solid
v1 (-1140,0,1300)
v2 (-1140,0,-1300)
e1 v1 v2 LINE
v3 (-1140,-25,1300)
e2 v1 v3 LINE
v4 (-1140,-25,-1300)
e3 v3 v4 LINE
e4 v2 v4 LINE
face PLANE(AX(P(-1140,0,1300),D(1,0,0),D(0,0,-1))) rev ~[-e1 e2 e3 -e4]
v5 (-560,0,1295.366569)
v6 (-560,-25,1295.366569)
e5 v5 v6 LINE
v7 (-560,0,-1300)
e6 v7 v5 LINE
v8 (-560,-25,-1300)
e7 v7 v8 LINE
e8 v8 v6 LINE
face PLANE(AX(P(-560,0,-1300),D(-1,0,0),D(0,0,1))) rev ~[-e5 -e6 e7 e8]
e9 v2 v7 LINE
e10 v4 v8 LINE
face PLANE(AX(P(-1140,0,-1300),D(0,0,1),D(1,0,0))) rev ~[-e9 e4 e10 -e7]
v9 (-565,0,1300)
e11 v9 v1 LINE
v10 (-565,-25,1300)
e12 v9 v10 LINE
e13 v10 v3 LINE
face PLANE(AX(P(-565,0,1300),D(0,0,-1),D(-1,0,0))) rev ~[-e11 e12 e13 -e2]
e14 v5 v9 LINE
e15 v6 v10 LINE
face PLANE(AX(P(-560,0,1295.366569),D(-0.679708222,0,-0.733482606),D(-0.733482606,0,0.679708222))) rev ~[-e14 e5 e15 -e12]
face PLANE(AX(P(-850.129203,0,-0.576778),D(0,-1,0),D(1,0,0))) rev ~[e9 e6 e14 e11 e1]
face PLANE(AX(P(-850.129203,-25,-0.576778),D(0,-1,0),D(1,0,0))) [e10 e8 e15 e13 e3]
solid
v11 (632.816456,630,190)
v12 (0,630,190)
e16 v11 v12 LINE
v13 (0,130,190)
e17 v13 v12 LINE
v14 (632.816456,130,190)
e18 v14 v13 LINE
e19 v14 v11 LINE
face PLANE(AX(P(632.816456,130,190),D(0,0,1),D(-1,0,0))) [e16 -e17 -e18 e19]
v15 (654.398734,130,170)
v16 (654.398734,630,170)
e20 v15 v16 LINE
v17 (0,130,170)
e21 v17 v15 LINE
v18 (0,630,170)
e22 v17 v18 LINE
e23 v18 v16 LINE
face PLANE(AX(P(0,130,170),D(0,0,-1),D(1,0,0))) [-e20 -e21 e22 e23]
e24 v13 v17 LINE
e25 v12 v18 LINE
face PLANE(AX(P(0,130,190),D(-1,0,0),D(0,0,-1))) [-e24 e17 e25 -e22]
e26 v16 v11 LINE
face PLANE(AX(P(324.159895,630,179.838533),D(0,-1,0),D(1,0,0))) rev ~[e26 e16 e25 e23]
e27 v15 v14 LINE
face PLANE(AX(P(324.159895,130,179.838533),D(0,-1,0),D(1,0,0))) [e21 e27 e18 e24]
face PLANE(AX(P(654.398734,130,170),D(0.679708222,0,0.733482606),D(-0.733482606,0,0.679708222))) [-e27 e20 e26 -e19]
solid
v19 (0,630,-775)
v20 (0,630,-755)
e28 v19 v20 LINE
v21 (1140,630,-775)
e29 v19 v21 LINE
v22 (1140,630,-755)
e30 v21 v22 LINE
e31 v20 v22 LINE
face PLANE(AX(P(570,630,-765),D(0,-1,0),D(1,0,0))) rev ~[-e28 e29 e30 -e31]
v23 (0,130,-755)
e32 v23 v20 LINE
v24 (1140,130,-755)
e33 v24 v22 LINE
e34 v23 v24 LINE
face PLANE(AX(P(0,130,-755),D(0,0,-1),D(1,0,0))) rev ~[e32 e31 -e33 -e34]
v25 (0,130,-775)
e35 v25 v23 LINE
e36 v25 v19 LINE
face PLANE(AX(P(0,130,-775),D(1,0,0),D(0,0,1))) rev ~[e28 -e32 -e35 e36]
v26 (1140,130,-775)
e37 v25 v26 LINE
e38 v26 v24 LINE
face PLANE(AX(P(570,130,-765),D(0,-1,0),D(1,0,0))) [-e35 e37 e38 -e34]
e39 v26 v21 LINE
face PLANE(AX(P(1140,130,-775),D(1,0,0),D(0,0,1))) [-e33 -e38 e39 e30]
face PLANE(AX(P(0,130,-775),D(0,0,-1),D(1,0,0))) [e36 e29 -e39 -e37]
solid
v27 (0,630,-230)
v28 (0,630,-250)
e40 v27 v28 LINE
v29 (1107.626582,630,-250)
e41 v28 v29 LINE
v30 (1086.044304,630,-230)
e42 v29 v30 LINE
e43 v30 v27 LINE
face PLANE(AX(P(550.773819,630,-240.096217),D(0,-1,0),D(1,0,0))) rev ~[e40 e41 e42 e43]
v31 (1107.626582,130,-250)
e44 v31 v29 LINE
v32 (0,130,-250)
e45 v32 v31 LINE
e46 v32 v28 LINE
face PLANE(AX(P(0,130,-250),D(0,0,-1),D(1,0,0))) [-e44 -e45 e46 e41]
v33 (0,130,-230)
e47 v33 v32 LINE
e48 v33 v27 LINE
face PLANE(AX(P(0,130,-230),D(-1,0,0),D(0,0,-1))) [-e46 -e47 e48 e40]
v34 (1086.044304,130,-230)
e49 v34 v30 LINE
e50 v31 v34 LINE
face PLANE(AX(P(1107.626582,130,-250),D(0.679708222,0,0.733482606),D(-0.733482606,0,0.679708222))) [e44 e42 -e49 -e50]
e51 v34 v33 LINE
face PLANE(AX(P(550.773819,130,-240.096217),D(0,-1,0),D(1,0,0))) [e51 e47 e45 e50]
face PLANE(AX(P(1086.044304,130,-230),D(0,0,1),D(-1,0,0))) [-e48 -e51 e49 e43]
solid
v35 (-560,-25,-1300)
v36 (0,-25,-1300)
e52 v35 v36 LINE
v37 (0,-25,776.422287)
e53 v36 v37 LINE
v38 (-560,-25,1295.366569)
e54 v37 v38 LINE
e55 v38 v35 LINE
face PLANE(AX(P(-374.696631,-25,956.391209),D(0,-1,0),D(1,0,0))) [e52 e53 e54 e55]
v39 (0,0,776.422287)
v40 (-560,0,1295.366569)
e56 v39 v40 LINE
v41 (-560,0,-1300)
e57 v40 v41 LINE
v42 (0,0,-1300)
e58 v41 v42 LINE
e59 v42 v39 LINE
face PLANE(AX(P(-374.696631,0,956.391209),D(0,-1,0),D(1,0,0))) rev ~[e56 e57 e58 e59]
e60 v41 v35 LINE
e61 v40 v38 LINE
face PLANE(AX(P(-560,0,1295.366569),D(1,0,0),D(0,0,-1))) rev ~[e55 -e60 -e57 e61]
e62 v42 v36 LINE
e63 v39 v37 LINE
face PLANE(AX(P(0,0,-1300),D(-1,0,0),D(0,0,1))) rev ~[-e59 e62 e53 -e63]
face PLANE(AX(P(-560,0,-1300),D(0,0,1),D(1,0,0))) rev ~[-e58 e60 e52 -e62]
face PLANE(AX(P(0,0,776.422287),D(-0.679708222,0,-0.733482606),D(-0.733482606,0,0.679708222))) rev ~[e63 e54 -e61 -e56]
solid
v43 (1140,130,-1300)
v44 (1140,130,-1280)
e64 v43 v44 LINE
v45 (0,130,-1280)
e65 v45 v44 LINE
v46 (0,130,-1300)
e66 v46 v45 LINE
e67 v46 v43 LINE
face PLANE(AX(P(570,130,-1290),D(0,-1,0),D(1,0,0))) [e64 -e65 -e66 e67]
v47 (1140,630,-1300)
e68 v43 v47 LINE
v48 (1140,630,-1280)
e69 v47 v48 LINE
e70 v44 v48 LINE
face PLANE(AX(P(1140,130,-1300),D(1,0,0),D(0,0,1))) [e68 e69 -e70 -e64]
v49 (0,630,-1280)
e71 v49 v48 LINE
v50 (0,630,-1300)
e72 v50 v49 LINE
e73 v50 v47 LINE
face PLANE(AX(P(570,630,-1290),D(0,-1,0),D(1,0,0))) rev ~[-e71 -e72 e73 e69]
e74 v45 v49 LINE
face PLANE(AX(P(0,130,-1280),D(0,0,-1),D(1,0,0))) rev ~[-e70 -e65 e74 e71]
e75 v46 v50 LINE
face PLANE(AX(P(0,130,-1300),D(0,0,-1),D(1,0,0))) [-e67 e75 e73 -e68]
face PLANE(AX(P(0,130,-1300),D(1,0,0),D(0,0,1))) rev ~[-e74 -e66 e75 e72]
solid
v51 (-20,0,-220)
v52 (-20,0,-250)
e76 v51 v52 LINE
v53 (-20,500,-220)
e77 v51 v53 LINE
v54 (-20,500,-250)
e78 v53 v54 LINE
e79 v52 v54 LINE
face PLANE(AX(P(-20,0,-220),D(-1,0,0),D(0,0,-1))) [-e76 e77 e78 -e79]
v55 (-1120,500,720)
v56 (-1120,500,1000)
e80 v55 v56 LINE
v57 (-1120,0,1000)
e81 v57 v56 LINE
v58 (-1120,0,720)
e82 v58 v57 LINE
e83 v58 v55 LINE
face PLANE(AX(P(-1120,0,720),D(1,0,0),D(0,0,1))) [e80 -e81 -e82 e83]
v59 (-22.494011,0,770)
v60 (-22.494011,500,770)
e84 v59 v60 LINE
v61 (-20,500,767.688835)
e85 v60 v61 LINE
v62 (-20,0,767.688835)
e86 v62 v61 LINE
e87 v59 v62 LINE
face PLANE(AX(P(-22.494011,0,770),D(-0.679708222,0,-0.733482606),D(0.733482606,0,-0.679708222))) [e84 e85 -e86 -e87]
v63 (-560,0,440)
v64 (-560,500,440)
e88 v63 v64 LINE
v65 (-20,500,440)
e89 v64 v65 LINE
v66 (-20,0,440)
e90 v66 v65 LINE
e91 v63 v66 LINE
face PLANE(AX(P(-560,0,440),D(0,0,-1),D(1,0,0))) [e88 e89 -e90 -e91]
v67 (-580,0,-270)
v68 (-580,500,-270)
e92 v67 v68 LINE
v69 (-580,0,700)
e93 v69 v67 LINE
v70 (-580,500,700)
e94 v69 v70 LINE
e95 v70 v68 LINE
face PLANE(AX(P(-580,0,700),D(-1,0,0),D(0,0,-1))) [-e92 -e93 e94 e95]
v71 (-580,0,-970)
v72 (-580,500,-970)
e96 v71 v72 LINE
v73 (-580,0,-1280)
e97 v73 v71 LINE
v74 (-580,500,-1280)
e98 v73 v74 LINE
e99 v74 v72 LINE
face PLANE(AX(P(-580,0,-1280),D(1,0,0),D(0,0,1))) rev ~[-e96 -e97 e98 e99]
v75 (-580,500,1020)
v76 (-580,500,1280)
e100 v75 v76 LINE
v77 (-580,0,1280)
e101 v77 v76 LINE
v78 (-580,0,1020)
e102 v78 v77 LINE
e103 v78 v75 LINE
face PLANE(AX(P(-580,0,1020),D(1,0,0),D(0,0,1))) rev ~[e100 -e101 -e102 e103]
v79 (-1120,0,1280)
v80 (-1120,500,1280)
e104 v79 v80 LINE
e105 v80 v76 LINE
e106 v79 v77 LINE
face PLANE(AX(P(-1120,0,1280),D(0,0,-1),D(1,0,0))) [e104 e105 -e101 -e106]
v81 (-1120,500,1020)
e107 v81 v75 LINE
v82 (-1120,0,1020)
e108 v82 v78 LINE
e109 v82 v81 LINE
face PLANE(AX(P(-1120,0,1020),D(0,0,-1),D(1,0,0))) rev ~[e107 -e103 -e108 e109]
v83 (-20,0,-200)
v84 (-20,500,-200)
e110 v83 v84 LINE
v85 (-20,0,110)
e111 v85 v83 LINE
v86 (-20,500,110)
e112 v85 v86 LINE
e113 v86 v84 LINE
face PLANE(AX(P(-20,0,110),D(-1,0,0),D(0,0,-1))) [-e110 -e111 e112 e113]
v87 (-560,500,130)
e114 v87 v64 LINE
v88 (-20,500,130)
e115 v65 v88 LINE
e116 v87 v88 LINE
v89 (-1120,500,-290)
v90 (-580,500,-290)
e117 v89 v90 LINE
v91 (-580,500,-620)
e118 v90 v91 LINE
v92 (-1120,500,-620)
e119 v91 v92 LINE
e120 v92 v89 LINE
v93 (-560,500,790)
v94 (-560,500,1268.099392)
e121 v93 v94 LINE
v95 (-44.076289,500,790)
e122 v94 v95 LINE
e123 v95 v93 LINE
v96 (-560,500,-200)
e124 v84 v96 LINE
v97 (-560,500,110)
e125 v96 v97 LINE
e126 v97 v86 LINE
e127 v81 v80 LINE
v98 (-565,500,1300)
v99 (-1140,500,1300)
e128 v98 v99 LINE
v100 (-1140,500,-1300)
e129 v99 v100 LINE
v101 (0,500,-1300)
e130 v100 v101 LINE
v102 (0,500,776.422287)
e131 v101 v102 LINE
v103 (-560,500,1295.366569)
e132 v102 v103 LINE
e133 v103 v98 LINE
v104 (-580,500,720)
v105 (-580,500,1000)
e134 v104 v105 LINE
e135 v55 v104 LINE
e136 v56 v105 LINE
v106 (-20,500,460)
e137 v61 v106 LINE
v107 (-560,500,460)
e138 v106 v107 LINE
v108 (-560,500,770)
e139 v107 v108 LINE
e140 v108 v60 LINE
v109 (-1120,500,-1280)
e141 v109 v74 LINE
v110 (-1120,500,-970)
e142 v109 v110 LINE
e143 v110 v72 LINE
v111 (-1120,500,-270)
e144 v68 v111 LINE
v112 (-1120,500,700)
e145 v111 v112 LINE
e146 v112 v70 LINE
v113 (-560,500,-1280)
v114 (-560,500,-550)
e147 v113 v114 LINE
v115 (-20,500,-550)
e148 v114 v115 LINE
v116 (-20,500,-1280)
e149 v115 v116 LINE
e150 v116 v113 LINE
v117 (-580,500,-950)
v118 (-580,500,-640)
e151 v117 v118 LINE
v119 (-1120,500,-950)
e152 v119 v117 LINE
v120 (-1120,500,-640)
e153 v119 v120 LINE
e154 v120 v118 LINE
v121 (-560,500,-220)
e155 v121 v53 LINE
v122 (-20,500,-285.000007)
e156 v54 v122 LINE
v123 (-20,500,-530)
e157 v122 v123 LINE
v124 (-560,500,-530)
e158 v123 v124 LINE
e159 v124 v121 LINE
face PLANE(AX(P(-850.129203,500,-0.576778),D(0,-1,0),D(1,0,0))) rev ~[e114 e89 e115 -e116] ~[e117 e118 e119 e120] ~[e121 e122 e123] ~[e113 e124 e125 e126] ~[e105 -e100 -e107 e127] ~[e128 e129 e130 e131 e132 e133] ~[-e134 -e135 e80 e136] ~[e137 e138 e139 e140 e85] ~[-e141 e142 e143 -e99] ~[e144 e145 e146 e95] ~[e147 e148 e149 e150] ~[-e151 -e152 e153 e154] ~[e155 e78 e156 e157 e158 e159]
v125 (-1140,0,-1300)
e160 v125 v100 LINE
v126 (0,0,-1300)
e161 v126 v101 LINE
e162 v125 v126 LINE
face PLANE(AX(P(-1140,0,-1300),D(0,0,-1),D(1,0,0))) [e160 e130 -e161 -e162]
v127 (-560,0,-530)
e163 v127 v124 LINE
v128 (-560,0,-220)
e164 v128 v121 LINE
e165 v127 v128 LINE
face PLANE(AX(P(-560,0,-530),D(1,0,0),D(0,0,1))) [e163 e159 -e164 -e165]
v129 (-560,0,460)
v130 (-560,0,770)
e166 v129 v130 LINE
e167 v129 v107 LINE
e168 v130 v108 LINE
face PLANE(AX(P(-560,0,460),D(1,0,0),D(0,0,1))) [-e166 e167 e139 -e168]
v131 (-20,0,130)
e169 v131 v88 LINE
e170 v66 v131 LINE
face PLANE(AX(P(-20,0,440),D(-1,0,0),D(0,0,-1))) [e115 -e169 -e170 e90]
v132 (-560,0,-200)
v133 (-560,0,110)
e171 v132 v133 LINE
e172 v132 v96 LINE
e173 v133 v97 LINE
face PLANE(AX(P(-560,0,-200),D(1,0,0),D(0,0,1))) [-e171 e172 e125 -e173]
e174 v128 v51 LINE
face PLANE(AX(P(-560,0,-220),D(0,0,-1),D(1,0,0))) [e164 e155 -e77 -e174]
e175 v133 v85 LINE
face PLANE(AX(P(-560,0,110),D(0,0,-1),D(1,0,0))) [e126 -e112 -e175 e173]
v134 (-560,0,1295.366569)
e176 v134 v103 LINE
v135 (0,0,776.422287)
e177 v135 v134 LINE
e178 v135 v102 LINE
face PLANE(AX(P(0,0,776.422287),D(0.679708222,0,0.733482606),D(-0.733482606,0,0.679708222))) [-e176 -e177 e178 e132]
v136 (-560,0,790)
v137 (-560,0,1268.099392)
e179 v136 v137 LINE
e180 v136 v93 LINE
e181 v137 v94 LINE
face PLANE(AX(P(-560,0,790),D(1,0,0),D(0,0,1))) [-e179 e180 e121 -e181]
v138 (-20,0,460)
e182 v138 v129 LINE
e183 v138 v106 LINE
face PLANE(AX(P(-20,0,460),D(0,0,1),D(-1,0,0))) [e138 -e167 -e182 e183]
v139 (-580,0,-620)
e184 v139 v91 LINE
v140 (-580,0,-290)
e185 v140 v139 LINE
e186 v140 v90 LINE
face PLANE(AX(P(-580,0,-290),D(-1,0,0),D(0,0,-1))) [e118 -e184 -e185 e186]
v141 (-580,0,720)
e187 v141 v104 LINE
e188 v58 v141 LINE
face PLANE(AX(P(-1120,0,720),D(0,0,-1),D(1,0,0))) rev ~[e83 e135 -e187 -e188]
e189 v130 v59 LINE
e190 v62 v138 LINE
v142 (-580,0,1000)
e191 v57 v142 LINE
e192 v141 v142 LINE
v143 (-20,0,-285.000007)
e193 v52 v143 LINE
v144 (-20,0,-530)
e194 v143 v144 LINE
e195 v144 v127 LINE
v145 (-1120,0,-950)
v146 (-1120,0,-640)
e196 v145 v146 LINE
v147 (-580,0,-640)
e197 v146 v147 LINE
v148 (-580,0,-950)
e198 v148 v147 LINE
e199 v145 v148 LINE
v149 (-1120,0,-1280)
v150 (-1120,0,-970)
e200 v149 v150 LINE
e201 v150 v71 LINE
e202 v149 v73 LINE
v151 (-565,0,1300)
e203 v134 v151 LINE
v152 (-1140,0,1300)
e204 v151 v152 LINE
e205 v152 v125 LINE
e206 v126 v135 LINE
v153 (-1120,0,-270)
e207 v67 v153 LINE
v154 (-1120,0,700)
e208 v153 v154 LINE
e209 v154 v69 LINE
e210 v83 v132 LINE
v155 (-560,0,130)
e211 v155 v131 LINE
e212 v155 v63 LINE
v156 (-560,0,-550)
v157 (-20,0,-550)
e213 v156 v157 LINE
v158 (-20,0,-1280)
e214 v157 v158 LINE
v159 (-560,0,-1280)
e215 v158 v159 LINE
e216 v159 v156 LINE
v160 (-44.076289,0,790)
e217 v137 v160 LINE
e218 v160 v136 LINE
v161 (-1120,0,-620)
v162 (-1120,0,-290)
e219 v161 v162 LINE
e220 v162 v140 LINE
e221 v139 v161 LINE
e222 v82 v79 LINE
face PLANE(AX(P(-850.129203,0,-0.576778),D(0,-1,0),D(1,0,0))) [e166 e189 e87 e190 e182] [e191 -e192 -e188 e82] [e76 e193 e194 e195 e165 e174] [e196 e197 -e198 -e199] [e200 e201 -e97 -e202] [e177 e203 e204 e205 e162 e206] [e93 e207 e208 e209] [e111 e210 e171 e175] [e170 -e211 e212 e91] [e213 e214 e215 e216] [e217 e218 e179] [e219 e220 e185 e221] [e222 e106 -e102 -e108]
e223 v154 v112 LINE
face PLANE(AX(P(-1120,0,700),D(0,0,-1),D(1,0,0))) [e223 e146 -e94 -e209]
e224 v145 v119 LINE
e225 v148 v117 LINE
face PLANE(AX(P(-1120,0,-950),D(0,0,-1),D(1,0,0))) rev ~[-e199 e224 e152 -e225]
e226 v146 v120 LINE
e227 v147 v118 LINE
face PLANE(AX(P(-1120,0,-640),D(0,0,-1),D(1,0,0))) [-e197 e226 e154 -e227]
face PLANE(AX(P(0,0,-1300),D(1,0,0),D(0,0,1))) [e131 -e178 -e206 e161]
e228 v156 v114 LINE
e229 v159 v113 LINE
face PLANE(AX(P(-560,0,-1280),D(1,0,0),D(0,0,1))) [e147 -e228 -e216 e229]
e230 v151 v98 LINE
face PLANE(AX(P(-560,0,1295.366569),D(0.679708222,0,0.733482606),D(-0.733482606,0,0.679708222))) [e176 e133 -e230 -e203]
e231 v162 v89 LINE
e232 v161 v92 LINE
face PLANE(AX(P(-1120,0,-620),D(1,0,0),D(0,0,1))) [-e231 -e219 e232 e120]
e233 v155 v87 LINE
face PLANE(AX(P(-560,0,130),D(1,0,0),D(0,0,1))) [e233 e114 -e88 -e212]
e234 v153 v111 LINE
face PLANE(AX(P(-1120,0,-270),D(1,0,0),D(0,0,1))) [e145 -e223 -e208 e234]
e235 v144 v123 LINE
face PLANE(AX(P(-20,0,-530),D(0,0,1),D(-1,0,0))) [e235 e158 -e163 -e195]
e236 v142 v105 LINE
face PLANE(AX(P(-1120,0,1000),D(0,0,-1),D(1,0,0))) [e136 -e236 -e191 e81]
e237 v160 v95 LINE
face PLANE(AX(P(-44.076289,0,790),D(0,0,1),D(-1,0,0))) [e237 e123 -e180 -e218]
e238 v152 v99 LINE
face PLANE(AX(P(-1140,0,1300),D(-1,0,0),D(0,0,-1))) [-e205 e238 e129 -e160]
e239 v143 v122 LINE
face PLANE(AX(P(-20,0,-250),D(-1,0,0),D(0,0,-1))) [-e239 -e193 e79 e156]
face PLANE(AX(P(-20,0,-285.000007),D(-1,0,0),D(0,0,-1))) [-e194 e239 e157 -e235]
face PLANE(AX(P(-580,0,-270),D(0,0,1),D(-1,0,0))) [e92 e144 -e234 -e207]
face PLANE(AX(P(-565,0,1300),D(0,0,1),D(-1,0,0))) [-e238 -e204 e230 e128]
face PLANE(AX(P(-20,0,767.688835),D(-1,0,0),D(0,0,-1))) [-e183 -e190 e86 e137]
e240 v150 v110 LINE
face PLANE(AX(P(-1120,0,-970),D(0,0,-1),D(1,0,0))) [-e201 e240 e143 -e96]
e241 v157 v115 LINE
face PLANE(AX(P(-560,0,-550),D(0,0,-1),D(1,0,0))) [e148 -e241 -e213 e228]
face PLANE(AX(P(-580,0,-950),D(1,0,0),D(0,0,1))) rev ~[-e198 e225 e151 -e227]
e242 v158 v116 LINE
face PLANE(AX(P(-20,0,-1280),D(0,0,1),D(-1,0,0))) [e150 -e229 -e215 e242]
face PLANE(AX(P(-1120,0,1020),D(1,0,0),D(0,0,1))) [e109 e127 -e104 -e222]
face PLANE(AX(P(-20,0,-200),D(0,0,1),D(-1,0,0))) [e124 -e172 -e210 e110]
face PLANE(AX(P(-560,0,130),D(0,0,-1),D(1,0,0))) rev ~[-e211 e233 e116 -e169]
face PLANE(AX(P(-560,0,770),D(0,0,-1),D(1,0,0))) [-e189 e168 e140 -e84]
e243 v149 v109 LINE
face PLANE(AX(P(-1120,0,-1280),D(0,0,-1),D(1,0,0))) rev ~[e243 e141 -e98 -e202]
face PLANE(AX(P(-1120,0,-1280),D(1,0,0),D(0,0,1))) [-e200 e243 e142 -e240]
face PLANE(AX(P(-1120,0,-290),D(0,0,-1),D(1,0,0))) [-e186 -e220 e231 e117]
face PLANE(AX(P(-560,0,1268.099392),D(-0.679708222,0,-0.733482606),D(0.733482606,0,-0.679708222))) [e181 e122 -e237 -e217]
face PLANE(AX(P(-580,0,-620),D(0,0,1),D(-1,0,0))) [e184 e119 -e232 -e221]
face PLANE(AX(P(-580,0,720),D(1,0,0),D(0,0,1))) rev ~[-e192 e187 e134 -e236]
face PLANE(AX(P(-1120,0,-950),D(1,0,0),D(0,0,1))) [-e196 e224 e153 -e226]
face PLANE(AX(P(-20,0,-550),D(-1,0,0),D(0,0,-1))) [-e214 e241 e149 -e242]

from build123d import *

# Parameters (mm, degrees)
F0_W     = 540
F0_H     = 310
F0_H_2   = 280
F0_H_3   = 260
F0_H_4   = 20
F1_DEPTH = 500
F0_H_5   = 920
F0_H_6   = 275
F0_H_7   = 35
F0_H_8   = 30
F2_DEPTH = 25
F0_H_9   = 250
F0_H_10  = 230
F3_DEPTH = 25
F4_START = -130
F4_DEPTH = 500
F0_W_2   = 1140
F0_H_11  = 20.0000000002


# Not quite as in the source:
# - a feature names something its author has since deleted; it is built from what else it names


with BuildPart() as f1:
    # F0 (on Front) → F1 (new body)
    with BuildSketch(Plane.XZ):
        Polygon((-1140, -1300), (-560, -1300), (-560, -1280), (-560, -1050), (-560, -800), (-560, -550), (-560, -530), (-560, -220), (-560, -200), (-560, 110), (-560, 130), (-560, 440), (-560, 460), (-560, 770), (-560, 790), (-560, 1268.0993919815), (-560, 1295.366568915), (-565, 1300), (-1140, 1300), align=None)
        with Locations((-850, -1125)):
            Rectangle(F0_W, F0_H, mode=Mode.SUBTRACT)
        with Locations((-850, -795)):
            Rectangle(F0_W, F0_H, mode=Mode.SUBTRACT)
        Polygon((-580, -290), (-580, -325), (-580, -345), (-580, -620), (-1120, -620), (-1120, -345), (-1120, -325), (-1120, -290), align=None, mode=Mode.SUBTRACT)
        Polygon((-1120, 700), (-580, 700), (-580, 670), (-580, 650), (-580, -270), (-1120, -270), (-1120, 650), (-1120, 670), align=None, mode=Mode.SUBTRACT)
        with Locations((-850, 860)):
            Rectangle(F0_W, F0_H_2, mode=Mode.SUBTRACT)
        with Locations((-850, 1150)):
            Rectangle(F0_W, F0_H_3, mode=Mode.SUBTRACT)
        Polygon((-20.0000000001, -250), (0, -250), (0, -230), (0, 170), (0, 190), (0, 776.4222873899), (-560, 1295.366568915), (-560, 1268.0993919815), (-44.0762890327, 790), (-560, 790), (-560, 770), (-22.4940105517, 770), (-20, 767.6888347967), (-20, 720), (-20, 700), (-20, 460), (-560, 460), (-560, 440), (-20, 440), (-20, 374.9999928474), (-20, 354.9999928474), (-20, 130), (-20, 110), (-20, -200), (-560, -200), (-560, -220), (-20, -220), align=None)
        with Locations((-290, 120)):
            Rectangle(F0_W, F0_H_4)
        Polygon((-560, -1300), (0, -1300), (0, -1280), (0, -775), (0, -755), (0, -250), (-20.0000000001, -250), (-20, -285.0000071528), (-20, -305.0000071528), (-20, -530), (-560, -530), (-560, -550), (-20, -550), (-20, -800), (-20, -1050), (-20, -1280), (-560, -1280), align=None)
    extrude(amount=-F1_DEPTH)


with BuildPart() as f2:
    # F0 (on Front) → F2 (new body)
    with BuildSketch(Plane.XZ):
        Polygon((-1140, -1300), (-560, -1300), (-560, -1280), (-560, -1050), (-560, -800), (-560, -550), (-560, -530), (-560, -220), (-560, -200), (-560, 110), (-560, 130), (-560, 440), (-560, 460), (-560, 770), (-560, 790), (-560, 1268.0993919815), (-560, 1295.366568915), (-565, 1300), (-1140, 1300), align=None)
        with Locations((-850, -1125)):
            Rectangle(F0_W, F0_H, mode=Mode.SUBTRACT)
        with Locations((-850, -795)):
            Rectangle(F0_W, F0_H, mode=Mode.SUBTRACT)
        Polygon((-580, -290), (-580, -325), (-580, -345), (-580, -620), (-1120, -620), (-1120, -345), (-1120, -325), (-1120, -290), align=None, mode=Mode.SUBTRACT)
        Polygon((-1120, 700), (-580, 700), (-580, 670), (-580, 650), (-580, -270), (-1120, -270), (-1120, 650), (-1120, 670), align=None, mode=Mode.SUBTRACT)
        with Locations((-850, 860)):
            Rectangle(F0_W, F0_H_2, mode=Mode.SUBTRACT)
        with Locations((-850, 1150)):
            Rectangle(F0_W, F0_H_3, mode=Mode.SUBTRACT)
        with Locations((-850, 190)):
            Rectangle(F0_W, F0_H_5)
        with Locations((-850, -795)):
            Rectangle(F0_W, F0_H)
        with Locations((-850, -1125)):
            Rectangle(F0_W, F0_H)
        with Locations((-850, 860)):
            Rectangle(F0_W, F0_H_2)
        with Locations((-850, -482.5)):
            Rectangle(F0_W, F0_H_6)
        with Locations((-850, 1150)):
            Rectangle(F0_W, F0_H_3)
        with Locations((-850, -307.5)):
            Rectangle(F0_W, F0_H_7)
        with Locations((-850, 685)):
            Rectangle(F0_W, F0_H_8)
        with Locations((-850, 660)):
            Rectangle(F0_W, F0_H_4)
        with Locations((-850, -335)):
            Rectangle(F0_W, F0_H_4)
    extrude(amount=F2_DEPTH)


with BuildPart() as f3:
    # F0 (on Front) → F3 (new body)
    with BuildSketch(Plane.XZ):
        Polygon((-44.0762890327, 790), (-560, 1268.0993919815), (-560, 790), align=None)
        Polygon((-560, -1300), (0, -1300), (0, -1280), (0, -775), (0, -755), (0, -250), (-20.0000000001, -250), (-20, -285.0000071528), (-20, -305.0000071528), (-20, -530), (-560, -530), (-560, -550), (-20, -550), (-20, -800), (-20, -1050), (-20, -1280), (-560, -1280), align=None)
        with Locations((-290, -675)):
            Rectangle(F0_W, F0_H_9)
        with Locations((-290, -925)):
            Rectangle(F0_W, F0_H_9)
        with Locations((-290, -1165)):
            Rectangle(F0_W, F0_H_10)
        Polygon((-20, -285.0000071528), (-20, -250), (-20, -220), (-560, -220), (-560, -530), (-20, -530), (-20, -305.0000071528), align=None)
        Polygon((-20.0000000001, -250), (0, -250), (0, -230), (0, 170), (0, 190), (0, 776.4222873899), (-560, 1295.366568915), (-560, 1268.0993919815), (-44.0762890327, 790), (-560, 790), (-560, 770), (-22.4940105517, 770), (-20, 767.6888347967), (-20, 720), (-20, 700), (-20, 460), (-560, 460), (-560, 440), (-20, 440), (-20, 374.9999928474), (-20, 354.9999928474), (-20, 130), (-20, 110), (-20, -200), (-560, -200), (-560, -220), (-20, -220), align=None)
        with Locations((-290, -45)):
            Rectangle(F0_W, F0_H)
        with Locations((-290, 120)):
            Rectangle(F0_W, F0_H_4)
        Polygon((-20, 440), (-560, 440), (-560, 130), (-20, 130), (-20, 354.9999928474), (-20, 374.9999928474), align=None)
        Polygon((-22.4940105517, 770), (-560, 770), (-560, 460), (-20, 460), (-20, 700), (-20, 720), (-20, 767.6888347967), align=None)
    extrude(amount=F3_DEPTH)


with BuildPart() as f4:
    # F0 (on Front) → F4 (new body)
    with BuildSketch(Plane.XZ.offset(F4_START)):
        Polygon((0, 190), (0, 170), (654.3987341771, 169.9999999999), (632.8164556961, 189.9999999999), align=None)
    extrude(amount=-F4_DEPTH)


with BuildPart() as f4b:
    # F0 (on Front) → F4, piece 2 (new body)
    with BuildSketch(Plane.XZ.offset(F4_START)):
        Polygon((0, -230), (0, -250), (1107.6265822783, -250.0000000001), (1086.0443037973, -230.0000000001), align=None)
    extrude(amount=-F4_DEPTH)


with BuildPart() as f4c:
    # F0 (on Front) → F4, piece 3 (new body)
    with BuildSketch(Plane.XZ.offset(F4_START)):
        with Locations((570, -765.0000000001)):
            Rectangle(F0_W_2, F0_H_11)
    extrude(amount=-F4_DEPTH)


with BuildPart() as f4d:
    # F0 (on Front) → F4, piece 4 (new body)
    with BuildSketch(Plane.XZ.offset(F4_START)):
        with Locations((570, -1290)):
            Rectangle(F0_W_2, F0_H_4)
    extrude(amount=-F4_DEPTH)


solid = Compound([f1.part, f2.part, f3.part, f4.part, f4b.part, f4c.part, f4d.part])
